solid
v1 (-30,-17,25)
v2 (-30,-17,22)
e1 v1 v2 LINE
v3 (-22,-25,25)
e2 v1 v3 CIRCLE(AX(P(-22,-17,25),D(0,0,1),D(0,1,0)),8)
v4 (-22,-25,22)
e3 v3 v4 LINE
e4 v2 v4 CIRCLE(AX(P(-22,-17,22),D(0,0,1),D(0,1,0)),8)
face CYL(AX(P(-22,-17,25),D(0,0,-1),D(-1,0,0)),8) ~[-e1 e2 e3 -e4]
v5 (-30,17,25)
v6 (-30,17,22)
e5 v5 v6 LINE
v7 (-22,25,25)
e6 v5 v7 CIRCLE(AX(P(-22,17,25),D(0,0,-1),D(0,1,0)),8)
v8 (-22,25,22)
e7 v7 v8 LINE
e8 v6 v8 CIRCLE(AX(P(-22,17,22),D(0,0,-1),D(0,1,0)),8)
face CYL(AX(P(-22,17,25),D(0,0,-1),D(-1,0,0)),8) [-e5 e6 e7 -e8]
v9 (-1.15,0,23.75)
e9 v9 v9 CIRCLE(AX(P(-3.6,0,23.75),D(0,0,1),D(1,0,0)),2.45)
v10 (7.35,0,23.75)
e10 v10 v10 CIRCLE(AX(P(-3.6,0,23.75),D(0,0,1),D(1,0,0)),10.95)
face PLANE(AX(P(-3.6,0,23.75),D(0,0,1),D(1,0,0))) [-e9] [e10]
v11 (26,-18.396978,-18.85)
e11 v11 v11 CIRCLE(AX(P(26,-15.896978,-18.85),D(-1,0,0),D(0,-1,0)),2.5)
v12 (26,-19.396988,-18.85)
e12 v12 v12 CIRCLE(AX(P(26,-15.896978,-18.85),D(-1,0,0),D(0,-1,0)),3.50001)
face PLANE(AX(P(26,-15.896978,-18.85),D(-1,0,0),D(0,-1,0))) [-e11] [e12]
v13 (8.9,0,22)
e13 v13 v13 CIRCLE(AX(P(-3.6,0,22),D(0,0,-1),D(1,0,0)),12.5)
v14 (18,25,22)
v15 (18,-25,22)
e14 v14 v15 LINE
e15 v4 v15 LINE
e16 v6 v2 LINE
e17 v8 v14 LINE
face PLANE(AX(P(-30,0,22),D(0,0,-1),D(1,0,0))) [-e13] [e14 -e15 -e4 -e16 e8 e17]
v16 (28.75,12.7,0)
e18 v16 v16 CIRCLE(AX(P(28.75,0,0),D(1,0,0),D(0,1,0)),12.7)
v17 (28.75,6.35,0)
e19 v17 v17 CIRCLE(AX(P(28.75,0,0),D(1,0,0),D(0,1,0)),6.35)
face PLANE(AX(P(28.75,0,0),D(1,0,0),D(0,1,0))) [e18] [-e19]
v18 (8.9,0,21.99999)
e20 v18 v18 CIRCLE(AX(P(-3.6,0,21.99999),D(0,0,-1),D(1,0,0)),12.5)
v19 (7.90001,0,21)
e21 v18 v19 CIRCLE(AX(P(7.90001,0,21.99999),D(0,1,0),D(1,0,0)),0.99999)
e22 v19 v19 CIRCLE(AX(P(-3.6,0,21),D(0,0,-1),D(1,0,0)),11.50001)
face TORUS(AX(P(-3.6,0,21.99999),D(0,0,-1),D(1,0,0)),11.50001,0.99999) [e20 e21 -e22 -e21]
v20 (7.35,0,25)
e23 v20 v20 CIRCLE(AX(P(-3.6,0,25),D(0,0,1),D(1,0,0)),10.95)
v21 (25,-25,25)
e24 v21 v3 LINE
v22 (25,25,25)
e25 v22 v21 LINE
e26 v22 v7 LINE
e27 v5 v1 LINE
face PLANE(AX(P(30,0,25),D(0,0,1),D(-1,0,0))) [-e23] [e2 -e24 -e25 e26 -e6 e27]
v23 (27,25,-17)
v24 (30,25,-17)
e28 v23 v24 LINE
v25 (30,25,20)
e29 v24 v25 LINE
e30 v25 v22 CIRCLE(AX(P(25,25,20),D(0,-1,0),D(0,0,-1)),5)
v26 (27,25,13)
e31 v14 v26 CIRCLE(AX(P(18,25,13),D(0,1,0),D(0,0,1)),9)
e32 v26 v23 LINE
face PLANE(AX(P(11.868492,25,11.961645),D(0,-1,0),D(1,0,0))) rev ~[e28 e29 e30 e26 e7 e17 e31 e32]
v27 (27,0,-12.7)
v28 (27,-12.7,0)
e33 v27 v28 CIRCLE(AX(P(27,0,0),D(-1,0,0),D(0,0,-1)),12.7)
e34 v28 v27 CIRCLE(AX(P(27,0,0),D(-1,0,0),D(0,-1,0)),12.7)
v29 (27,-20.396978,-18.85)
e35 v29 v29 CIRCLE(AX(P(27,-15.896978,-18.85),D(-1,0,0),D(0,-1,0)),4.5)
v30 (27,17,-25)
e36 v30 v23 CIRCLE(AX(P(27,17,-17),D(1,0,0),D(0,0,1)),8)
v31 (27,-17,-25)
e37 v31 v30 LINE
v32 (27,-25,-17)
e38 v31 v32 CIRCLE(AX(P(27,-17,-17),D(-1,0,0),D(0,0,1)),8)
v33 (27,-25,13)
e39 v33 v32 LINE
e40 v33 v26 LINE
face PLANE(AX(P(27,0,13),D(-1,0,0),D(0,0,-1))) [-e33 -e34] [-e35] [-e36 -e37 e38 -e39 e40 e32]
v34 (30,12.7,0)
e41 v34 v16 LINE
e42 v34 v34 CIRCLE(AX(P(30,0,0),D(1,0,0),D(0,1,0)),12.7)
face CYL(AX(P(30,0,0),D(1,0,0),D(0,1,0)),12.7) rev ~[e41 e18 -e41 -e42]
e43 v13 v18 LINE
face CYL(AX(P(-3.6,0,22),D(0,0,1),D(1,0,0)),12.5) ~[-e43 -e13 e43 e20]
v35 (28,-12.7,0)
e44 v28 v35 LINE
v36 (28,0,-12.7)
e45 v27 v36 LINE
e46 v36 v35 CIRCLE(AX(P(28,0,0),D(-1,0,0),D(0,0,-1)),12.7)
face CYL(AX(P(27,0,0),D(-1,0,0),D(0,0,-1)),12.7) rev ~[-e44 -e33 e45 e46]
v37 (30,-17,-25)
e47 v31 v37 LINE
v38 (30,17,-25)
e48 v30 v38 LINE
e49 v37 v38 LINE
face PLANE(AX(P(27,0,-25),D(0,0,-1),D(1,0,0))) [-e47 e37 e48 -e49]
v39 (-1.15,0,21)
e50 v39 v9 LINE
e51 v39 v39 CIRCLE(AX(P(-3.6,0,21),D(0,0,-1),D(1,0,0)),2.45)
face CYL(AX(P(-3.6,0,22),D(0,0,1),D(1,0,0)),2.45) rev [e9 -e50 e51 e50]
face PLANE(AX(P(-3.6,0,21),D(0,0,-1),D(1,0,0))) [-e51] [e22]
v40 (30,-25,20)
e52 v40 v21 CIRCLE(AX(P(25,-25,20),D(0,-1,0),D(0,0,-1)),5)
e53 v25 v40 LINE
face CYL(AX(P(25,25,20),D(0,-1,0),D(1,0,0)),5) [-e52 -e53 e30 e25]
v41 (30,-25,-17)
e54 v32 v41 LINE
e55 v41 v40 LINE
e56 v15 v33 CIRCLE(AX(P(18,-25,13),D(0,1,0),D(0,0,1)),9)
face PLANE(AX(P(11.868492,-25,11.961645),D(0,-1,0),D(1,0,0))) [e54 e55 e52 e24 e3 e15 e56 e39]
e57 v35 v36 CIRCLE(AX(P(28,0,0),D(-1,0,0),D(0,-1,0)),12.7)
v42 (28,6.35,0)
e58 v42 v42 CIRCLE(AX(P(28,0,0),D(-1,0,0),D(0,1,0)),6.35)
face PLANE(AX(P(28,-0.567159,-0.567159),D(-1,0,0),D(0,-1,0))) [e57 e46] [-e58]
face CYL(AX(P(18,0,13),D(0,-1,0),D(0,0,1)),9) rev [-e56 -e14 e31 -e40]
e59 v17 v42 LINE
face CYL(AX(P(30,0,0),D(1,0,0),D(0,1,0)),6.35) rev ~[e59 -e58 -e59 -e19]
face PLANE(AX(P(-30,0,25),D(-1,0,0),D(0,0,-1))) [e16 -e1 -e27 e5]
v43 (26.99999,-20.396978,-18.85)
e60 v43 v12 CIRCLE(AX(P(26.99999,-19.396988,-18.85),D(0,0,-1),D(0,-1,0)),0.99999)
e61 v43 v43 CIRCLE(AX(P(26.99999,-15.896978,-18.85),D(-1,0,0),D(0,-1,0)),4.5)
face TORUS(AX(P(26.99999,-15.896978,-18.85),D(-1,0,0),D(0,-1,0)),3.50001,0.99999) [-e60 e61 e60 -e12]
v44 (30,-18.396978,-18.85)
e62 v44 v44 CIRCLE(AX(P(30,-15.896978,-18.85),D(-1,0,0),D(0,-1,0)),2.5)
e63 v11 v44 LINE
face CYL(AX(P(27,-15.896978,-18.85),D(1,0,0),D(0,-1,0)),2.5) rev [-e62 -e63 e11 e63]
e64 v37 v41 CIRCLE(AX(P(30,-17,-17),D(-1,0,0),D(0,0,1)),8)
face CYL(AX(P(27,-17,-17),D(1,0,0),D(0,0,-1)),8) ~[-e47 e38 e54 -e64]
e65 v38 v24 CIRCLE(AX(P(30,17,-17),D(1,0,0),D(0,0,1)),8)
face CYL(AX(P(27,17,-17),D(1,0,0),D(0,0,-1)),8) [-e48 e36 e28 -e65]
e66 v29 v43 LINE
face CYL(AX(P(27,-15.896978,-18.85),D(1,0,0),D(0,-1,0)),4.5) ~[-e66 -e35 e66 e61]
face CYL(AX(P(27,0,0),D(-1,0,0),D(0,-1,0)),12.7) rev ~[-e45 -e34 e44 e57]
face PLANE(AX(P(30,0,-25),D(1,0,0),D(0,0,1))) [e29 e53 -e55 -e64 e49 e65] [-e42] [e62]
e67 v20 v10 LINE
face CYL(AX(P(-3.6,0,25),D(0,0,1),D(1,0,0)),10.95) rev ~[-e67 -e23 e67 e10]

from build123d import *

# Parameters (mm, degrees)
F1_DEPTH  = 25
F2_R      = 8
F3_R      = 10.95
F3_R_2    = 2.45
F5_DEPTH  = 1.25
F6_DEPTH  = 3
F4_R      = 12.7
F4_R_2    = 6.35
F8_DEPTH  = 1.25
F7_R      = 6.35
F9_DEPTH  = 1
F10_DEPTH = 3
F11_R     = 5
F7_R_2    = 2.5
F12_DEPTH = 3
F7_R_3    = 4.5
F13_DEPTH = 1
F14_R     = 0.99999
F15_R     = 12.5
F15_R_2   = 2.45
F16_DEPTH = 1
F17_R     = 0.99999


# Not quite as in the source:
# - a fillet or chamfer is up to 0.001 mm smaller than in the source, because OpenCascade refuses the exact size


with BuildPart() as f1:
    # F0 (on Front) → F1 (new body, symmetric)
    with BuildSketch(Plane.XZ):
        with BuildLine():
            Line((30, -25), (30, 25))
            Line((30, 25), (-30, 25))
            Line((-30, 25), (-30, 22))
            Line((-30, 22), (18, 22))
            ThreePointArc((18, 22), (24.3639610307, 19.3639610307), (27, 13))
            Line((27, 13), (27, -25))
            Line((27, -25), (30, -25))
        make_face()
    extrude(amount=F1_DEPTH, both=True)

    # F2
    f2_edges = [f1.edges().sort_by_distance(p)[0] for p in [
        (-30, -25, 23.5),
        (-30, 25, 23.5),
        (28.5, 25, -25),
        (28.5, -25, -25),
    ]]
    fillet(f2_edges, radius=F2_R)

    # F3 (on face) → F5 (cut)
    with BuildSketch(Plane.XY.offset(25)):
        with Locations((-3.6, 0)):
            Circle(F3_R)
        with Locations((-3.6, 0)):
            Circle(F3_R_2, mode=Mode.SUBTRACT)
    extrude(amount=-F5_DEPTH, mode=Mode.SUBTRACT)

    # F6 (cut): a face of the model
    f6_faces = [f1.faces().sort_by_distance(p)[0] for p in [
        (-3.6, 0, 25),
    ]]
    extrude(f6_faces, amount=-F6_DEPTH, mode=Mode.SUBTRACT)

    # F4 (on face) → F8 (cut)
    with BuildSketch(Plane.YZ.offset(30)):
        Circle(F4_R)
        Circle(F4_R_2, mode=Mode.SUBTRACT)
    extrude(amount=-F8_DEPTH, mode=Mode.SUBTRACT)

    # F7 (on face) → F9 (cut)
    with BuildSketch(Plane(origin=(27, 0, 0), x_dir=(0, -1, 0), z_dir=(-1, 0, 0))):
        with BuildLine():
            ThreePointArc((0, -12.7), (8.9802561211, -8.9802561211), (12.7, 0))
            ThreePointArc((12.7, 0), (-8.9802561211, 8.9802561211), (0, -12.7))
        make_face()
        Circle(F7_R, mode=Mode.SUBTRACT)
    extrude(amount=-F9_DEPTH, mode=Mode.SUBTRACT)

    # F10 (cut): a face of the model
    f10_faces = [f1.faces().sort_by_distance(p)[0] for p in [
        (30, 0, 0),
    ]]
    extrude(f10_faces, amount=-F10_DEPTH, mode=Mode.SUBTRACT)

    # F11
    f11_edges = [f1.edges().sort_by_distance(p)[0] for p in [
        (30, 0, 25),
    ]]
    fillet(f11_edges, radius=F11_R)

    # F7 (on face) → F12 (cut)
    with BuildSketch(Plane(origin=(27, 0, 0), x_dir=(0, -1, 0), z_dir=(-1, 0, 0))):
        with Locations((15.8969778568, -18.85)):
            Circle(F7_R_2)
    extrude(amount=-F12_DEPTH, mode=Mode.SUBTRACT)

    # F7 (on face) → F13 (join)
    with BuildSketch(Plane(origin=(27, 0, 0), x_dir=(0, -1, 0), z_dir=(-1, 0, 0))):
        with Locations((15.8969778568, -18.85)):
            Circle(F7_R_3)
        with Locations((15.8969778568, -18.85)):
            Circle(F7_R_2, mode=Mode.SUBTRACT)
    extrude(amount=F13_DEPTH)

    # F14 (radius 1 in the source; OpenCascade refuses exactly that, so slightly less here)
    f14_edges = [f1.edges().sort_by_distance(p)[0] for p in [
        (26, -11.396978, -18.85),
    ]]
    fillet(f14_edges, radius=F14_R)

    # F15 (on face) → F16 (join)
    with BuildSketch(Plane(origin=(0, 0, 22), x_dir=(1, 0, 0), z_dir=(0, 0, -1))):
        with Locations((-3.6, 0)):
            Circle(F15_R)
        with Locations((-3.6, 0)):
            Circle(F15_R_2, mode=Mode.SUBTRACT)
    extrude(amount=F16_DEPTH)

    # F17 (radius 1 in the source; OpenCascade refuses exactly that, so slightly less here)
    f17_edges = [f1.edges().sort_by_distance(p)[0] for p in [
        (-16.1, 0, 21),
    ]]
    fillet(f17_edges, radius=F17_R)


solid = f1.part
